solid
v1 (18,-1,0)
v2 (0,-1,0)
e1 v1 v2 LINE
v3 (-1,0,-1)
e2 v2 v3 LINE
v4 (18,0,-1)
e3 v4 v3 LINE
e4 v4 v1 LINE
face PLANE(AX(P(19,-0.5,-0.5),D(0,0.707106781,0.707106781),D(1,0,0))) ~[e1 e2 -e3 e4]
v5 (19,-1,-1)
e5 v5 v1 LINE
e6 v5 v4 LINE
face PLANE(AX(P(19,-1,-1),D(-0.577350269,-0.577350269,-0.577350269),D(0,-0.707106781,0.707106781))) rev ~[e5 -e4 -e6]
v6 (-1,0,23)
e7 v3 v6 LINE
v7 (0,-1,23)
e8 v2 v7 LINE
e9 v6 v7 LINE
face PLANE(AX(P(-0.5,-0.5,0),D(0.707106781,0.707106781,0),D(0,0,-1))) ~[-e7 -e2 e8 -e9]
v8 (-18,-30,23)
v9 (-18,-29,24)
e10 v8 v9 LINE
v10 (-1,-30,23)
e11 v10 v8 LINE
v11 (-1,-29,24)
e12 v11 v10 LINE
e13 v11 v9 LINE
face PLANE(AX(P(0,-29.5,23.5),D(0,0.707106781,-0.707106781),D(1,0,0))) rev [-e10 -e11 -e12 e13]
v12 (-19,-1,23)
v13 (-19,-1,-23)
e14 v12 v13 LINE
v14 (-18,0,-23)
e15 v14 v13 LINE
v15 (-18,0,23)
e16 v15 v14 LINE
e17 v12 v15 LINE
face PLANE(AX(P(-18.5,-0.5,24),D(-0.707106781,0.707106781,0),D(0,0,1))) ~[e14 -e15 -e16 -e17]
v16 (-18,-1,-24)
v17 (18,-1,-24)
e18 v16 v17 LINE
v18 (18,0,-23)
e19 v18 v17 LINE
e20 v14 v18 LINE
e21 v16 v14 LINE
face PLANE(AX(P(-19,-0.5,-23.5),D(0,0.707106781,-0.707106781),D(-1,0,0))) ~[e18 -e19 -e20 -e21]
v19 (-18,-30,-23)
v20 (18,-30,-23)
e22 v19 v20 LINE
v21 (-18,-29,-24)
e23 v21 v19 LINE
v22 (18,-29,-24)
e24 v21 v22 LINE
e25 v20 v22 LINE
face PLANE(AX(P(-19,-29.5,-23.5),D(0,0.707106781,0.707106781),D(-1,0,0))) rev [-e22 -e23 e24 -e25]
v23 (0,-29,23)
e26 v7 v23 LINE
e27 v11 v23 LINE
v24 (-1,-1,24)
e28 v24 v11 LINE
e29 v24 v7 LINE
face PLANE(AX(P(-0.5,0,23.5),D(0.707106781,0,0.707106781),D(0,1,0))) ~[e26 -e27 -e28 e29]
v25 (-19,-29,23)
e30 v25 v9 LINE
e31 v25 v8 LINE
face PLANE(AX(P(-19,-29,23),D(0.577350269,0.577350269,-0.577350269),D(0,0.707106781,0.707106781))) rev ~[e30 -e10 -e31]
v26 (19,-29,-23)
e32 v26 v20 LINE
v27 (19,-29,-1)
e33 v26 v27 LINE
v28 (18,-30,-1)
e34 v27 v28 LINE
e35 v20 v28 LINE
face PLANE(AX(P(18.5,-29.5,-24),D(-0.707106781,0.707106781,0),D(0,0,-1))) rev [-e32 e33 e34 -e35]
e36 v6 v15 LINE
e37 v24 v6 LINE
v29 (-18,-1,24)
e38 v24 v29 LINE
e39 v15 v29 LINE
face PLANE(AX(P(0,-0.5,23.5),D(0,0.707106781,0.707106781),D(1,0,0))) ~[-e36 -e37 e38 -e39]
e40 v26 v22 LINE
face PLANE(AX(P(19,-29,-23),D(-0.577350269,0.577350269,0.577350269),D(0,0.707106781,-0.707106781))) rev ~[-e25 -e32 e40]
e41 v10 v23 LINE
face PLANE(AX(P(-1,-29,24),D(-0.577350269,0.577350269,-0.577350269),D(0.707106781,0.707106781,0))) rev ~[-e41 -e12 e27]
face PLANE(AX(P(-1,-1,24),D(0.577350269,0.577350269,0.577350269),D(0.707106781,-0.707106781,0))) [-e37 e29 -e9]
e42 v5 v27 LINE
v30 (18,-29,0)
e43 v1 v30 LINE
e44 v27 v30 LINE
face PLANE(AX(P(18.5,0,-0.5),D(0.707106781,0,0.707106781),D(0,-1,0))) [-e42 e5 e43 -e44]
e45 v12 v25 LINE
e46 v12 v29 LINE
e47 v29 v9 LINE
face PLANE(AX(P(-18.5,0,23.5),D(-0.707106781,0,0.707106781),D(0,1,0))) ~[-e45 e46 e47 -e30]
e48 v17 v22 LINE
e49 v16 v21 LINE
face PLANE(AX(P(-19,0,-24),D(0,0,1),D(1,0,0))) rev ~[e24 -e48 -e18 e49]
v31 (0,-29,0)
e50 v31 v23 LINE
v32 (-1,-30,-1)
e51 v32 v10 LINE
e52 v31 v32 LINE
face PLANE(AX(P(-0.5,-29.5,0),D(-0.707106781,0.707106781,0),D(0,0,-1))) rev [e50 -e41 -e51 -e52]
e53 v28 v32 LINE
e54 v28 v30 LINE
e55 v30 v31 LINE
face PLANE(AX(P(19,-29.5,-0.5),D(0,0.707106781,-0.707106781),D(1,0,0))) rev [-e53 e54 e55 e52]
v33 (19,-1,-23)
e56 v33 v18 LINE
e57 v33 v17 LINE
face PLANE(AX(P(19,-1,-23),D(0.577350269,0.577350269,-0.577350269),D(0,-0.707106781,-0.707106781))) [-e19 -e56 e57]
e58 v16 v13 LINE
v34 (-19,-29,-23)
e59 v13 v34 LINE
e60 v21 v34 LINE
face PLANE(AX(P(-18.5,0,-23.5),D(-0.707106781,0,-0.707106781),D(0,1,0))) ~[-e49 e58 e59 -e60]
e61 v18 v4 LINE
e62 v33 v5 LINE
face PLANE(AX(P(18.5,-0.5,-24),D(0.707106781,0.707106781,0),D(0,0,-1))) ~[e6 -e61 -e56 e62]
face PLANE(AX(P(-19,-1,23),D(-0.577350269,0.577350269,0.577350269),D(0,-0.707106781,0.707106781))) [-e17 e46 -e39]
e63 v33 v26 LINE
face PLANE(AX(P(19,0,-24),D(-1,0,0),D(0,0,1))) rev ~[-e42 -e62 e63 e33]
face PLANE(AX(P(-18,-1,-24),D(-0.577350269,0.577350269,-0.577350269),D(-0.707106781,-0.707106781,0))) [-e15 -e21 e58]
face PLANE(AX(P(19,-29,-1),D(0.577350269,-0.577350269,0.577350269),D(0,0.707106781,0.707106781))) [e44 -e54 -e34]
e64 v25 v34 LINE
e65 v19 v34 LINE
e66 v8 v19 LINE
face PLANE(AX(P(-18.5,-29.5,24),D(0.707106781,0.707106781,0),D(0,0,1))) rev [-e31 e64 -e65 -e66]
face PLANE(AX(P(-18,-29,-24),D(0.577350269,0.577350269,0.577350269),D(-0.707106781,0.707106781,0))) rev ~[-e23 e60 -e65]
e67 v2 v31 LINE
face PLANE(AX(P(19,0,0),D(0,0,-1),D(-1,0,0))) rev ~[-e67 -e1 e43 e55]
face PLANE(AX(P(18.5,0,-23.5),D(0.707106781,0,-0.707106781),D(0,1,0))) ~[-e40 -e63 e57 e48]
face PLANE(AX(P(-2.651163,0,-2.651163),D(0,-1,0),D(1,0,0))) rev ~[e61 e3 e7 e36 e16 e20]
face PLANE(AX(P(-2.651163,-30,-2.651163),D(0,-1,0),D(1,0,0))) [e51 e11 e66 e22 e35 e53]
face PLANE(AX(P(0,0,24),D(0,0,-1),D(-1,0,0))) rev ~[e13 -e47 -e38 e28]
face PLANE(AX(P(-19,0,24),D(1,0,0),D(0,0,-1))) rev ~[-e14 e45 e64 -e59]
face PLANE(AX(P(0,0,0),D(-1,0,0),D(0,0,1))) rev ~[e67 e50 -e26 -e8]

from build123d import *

# Parameters (mm, degrees)
F1_DEPTH = 30
F2_SIZE  = 1


# Not quite as in the source:
# - a feature names something its author has since deleted; it is built from what else it names


with BuildPart() as f1:
    # F0 (on Front) → F1 (new body)
    with BuildSketch(Plane.XZ):
        Polygon((19, 0), (0, 0), (0, 24), (-19, 24), (-19, -24), (19, -24), align=None)
    extrude(amount=F1_DEPTH)

    # F2
    f2_edges = [f1.edges().sort_by_distance(p)[0] for p in [
        (9.5, -30, 0),
        (0, -30, 12),
        (-9.5, -30, 24),
        (-19, -30, 0),
        (0, -30, -24),
        (19, -30, -12),
        (9.5, 0, 0),
        (0, 0, 12),
        (-9.5, 0, 24),
        (-19, 0, 0),
        (0, 0, -24),
        (19, 0, -12),
        (0, -15, 24),
        (-19, -15, 24),
        (-19, -15, -24),
        (19, -15, -24),
        (19, -15, 0),
    ]]
    chamfer(f2_edges, length=F2_SIZE)


solid = f1.part
